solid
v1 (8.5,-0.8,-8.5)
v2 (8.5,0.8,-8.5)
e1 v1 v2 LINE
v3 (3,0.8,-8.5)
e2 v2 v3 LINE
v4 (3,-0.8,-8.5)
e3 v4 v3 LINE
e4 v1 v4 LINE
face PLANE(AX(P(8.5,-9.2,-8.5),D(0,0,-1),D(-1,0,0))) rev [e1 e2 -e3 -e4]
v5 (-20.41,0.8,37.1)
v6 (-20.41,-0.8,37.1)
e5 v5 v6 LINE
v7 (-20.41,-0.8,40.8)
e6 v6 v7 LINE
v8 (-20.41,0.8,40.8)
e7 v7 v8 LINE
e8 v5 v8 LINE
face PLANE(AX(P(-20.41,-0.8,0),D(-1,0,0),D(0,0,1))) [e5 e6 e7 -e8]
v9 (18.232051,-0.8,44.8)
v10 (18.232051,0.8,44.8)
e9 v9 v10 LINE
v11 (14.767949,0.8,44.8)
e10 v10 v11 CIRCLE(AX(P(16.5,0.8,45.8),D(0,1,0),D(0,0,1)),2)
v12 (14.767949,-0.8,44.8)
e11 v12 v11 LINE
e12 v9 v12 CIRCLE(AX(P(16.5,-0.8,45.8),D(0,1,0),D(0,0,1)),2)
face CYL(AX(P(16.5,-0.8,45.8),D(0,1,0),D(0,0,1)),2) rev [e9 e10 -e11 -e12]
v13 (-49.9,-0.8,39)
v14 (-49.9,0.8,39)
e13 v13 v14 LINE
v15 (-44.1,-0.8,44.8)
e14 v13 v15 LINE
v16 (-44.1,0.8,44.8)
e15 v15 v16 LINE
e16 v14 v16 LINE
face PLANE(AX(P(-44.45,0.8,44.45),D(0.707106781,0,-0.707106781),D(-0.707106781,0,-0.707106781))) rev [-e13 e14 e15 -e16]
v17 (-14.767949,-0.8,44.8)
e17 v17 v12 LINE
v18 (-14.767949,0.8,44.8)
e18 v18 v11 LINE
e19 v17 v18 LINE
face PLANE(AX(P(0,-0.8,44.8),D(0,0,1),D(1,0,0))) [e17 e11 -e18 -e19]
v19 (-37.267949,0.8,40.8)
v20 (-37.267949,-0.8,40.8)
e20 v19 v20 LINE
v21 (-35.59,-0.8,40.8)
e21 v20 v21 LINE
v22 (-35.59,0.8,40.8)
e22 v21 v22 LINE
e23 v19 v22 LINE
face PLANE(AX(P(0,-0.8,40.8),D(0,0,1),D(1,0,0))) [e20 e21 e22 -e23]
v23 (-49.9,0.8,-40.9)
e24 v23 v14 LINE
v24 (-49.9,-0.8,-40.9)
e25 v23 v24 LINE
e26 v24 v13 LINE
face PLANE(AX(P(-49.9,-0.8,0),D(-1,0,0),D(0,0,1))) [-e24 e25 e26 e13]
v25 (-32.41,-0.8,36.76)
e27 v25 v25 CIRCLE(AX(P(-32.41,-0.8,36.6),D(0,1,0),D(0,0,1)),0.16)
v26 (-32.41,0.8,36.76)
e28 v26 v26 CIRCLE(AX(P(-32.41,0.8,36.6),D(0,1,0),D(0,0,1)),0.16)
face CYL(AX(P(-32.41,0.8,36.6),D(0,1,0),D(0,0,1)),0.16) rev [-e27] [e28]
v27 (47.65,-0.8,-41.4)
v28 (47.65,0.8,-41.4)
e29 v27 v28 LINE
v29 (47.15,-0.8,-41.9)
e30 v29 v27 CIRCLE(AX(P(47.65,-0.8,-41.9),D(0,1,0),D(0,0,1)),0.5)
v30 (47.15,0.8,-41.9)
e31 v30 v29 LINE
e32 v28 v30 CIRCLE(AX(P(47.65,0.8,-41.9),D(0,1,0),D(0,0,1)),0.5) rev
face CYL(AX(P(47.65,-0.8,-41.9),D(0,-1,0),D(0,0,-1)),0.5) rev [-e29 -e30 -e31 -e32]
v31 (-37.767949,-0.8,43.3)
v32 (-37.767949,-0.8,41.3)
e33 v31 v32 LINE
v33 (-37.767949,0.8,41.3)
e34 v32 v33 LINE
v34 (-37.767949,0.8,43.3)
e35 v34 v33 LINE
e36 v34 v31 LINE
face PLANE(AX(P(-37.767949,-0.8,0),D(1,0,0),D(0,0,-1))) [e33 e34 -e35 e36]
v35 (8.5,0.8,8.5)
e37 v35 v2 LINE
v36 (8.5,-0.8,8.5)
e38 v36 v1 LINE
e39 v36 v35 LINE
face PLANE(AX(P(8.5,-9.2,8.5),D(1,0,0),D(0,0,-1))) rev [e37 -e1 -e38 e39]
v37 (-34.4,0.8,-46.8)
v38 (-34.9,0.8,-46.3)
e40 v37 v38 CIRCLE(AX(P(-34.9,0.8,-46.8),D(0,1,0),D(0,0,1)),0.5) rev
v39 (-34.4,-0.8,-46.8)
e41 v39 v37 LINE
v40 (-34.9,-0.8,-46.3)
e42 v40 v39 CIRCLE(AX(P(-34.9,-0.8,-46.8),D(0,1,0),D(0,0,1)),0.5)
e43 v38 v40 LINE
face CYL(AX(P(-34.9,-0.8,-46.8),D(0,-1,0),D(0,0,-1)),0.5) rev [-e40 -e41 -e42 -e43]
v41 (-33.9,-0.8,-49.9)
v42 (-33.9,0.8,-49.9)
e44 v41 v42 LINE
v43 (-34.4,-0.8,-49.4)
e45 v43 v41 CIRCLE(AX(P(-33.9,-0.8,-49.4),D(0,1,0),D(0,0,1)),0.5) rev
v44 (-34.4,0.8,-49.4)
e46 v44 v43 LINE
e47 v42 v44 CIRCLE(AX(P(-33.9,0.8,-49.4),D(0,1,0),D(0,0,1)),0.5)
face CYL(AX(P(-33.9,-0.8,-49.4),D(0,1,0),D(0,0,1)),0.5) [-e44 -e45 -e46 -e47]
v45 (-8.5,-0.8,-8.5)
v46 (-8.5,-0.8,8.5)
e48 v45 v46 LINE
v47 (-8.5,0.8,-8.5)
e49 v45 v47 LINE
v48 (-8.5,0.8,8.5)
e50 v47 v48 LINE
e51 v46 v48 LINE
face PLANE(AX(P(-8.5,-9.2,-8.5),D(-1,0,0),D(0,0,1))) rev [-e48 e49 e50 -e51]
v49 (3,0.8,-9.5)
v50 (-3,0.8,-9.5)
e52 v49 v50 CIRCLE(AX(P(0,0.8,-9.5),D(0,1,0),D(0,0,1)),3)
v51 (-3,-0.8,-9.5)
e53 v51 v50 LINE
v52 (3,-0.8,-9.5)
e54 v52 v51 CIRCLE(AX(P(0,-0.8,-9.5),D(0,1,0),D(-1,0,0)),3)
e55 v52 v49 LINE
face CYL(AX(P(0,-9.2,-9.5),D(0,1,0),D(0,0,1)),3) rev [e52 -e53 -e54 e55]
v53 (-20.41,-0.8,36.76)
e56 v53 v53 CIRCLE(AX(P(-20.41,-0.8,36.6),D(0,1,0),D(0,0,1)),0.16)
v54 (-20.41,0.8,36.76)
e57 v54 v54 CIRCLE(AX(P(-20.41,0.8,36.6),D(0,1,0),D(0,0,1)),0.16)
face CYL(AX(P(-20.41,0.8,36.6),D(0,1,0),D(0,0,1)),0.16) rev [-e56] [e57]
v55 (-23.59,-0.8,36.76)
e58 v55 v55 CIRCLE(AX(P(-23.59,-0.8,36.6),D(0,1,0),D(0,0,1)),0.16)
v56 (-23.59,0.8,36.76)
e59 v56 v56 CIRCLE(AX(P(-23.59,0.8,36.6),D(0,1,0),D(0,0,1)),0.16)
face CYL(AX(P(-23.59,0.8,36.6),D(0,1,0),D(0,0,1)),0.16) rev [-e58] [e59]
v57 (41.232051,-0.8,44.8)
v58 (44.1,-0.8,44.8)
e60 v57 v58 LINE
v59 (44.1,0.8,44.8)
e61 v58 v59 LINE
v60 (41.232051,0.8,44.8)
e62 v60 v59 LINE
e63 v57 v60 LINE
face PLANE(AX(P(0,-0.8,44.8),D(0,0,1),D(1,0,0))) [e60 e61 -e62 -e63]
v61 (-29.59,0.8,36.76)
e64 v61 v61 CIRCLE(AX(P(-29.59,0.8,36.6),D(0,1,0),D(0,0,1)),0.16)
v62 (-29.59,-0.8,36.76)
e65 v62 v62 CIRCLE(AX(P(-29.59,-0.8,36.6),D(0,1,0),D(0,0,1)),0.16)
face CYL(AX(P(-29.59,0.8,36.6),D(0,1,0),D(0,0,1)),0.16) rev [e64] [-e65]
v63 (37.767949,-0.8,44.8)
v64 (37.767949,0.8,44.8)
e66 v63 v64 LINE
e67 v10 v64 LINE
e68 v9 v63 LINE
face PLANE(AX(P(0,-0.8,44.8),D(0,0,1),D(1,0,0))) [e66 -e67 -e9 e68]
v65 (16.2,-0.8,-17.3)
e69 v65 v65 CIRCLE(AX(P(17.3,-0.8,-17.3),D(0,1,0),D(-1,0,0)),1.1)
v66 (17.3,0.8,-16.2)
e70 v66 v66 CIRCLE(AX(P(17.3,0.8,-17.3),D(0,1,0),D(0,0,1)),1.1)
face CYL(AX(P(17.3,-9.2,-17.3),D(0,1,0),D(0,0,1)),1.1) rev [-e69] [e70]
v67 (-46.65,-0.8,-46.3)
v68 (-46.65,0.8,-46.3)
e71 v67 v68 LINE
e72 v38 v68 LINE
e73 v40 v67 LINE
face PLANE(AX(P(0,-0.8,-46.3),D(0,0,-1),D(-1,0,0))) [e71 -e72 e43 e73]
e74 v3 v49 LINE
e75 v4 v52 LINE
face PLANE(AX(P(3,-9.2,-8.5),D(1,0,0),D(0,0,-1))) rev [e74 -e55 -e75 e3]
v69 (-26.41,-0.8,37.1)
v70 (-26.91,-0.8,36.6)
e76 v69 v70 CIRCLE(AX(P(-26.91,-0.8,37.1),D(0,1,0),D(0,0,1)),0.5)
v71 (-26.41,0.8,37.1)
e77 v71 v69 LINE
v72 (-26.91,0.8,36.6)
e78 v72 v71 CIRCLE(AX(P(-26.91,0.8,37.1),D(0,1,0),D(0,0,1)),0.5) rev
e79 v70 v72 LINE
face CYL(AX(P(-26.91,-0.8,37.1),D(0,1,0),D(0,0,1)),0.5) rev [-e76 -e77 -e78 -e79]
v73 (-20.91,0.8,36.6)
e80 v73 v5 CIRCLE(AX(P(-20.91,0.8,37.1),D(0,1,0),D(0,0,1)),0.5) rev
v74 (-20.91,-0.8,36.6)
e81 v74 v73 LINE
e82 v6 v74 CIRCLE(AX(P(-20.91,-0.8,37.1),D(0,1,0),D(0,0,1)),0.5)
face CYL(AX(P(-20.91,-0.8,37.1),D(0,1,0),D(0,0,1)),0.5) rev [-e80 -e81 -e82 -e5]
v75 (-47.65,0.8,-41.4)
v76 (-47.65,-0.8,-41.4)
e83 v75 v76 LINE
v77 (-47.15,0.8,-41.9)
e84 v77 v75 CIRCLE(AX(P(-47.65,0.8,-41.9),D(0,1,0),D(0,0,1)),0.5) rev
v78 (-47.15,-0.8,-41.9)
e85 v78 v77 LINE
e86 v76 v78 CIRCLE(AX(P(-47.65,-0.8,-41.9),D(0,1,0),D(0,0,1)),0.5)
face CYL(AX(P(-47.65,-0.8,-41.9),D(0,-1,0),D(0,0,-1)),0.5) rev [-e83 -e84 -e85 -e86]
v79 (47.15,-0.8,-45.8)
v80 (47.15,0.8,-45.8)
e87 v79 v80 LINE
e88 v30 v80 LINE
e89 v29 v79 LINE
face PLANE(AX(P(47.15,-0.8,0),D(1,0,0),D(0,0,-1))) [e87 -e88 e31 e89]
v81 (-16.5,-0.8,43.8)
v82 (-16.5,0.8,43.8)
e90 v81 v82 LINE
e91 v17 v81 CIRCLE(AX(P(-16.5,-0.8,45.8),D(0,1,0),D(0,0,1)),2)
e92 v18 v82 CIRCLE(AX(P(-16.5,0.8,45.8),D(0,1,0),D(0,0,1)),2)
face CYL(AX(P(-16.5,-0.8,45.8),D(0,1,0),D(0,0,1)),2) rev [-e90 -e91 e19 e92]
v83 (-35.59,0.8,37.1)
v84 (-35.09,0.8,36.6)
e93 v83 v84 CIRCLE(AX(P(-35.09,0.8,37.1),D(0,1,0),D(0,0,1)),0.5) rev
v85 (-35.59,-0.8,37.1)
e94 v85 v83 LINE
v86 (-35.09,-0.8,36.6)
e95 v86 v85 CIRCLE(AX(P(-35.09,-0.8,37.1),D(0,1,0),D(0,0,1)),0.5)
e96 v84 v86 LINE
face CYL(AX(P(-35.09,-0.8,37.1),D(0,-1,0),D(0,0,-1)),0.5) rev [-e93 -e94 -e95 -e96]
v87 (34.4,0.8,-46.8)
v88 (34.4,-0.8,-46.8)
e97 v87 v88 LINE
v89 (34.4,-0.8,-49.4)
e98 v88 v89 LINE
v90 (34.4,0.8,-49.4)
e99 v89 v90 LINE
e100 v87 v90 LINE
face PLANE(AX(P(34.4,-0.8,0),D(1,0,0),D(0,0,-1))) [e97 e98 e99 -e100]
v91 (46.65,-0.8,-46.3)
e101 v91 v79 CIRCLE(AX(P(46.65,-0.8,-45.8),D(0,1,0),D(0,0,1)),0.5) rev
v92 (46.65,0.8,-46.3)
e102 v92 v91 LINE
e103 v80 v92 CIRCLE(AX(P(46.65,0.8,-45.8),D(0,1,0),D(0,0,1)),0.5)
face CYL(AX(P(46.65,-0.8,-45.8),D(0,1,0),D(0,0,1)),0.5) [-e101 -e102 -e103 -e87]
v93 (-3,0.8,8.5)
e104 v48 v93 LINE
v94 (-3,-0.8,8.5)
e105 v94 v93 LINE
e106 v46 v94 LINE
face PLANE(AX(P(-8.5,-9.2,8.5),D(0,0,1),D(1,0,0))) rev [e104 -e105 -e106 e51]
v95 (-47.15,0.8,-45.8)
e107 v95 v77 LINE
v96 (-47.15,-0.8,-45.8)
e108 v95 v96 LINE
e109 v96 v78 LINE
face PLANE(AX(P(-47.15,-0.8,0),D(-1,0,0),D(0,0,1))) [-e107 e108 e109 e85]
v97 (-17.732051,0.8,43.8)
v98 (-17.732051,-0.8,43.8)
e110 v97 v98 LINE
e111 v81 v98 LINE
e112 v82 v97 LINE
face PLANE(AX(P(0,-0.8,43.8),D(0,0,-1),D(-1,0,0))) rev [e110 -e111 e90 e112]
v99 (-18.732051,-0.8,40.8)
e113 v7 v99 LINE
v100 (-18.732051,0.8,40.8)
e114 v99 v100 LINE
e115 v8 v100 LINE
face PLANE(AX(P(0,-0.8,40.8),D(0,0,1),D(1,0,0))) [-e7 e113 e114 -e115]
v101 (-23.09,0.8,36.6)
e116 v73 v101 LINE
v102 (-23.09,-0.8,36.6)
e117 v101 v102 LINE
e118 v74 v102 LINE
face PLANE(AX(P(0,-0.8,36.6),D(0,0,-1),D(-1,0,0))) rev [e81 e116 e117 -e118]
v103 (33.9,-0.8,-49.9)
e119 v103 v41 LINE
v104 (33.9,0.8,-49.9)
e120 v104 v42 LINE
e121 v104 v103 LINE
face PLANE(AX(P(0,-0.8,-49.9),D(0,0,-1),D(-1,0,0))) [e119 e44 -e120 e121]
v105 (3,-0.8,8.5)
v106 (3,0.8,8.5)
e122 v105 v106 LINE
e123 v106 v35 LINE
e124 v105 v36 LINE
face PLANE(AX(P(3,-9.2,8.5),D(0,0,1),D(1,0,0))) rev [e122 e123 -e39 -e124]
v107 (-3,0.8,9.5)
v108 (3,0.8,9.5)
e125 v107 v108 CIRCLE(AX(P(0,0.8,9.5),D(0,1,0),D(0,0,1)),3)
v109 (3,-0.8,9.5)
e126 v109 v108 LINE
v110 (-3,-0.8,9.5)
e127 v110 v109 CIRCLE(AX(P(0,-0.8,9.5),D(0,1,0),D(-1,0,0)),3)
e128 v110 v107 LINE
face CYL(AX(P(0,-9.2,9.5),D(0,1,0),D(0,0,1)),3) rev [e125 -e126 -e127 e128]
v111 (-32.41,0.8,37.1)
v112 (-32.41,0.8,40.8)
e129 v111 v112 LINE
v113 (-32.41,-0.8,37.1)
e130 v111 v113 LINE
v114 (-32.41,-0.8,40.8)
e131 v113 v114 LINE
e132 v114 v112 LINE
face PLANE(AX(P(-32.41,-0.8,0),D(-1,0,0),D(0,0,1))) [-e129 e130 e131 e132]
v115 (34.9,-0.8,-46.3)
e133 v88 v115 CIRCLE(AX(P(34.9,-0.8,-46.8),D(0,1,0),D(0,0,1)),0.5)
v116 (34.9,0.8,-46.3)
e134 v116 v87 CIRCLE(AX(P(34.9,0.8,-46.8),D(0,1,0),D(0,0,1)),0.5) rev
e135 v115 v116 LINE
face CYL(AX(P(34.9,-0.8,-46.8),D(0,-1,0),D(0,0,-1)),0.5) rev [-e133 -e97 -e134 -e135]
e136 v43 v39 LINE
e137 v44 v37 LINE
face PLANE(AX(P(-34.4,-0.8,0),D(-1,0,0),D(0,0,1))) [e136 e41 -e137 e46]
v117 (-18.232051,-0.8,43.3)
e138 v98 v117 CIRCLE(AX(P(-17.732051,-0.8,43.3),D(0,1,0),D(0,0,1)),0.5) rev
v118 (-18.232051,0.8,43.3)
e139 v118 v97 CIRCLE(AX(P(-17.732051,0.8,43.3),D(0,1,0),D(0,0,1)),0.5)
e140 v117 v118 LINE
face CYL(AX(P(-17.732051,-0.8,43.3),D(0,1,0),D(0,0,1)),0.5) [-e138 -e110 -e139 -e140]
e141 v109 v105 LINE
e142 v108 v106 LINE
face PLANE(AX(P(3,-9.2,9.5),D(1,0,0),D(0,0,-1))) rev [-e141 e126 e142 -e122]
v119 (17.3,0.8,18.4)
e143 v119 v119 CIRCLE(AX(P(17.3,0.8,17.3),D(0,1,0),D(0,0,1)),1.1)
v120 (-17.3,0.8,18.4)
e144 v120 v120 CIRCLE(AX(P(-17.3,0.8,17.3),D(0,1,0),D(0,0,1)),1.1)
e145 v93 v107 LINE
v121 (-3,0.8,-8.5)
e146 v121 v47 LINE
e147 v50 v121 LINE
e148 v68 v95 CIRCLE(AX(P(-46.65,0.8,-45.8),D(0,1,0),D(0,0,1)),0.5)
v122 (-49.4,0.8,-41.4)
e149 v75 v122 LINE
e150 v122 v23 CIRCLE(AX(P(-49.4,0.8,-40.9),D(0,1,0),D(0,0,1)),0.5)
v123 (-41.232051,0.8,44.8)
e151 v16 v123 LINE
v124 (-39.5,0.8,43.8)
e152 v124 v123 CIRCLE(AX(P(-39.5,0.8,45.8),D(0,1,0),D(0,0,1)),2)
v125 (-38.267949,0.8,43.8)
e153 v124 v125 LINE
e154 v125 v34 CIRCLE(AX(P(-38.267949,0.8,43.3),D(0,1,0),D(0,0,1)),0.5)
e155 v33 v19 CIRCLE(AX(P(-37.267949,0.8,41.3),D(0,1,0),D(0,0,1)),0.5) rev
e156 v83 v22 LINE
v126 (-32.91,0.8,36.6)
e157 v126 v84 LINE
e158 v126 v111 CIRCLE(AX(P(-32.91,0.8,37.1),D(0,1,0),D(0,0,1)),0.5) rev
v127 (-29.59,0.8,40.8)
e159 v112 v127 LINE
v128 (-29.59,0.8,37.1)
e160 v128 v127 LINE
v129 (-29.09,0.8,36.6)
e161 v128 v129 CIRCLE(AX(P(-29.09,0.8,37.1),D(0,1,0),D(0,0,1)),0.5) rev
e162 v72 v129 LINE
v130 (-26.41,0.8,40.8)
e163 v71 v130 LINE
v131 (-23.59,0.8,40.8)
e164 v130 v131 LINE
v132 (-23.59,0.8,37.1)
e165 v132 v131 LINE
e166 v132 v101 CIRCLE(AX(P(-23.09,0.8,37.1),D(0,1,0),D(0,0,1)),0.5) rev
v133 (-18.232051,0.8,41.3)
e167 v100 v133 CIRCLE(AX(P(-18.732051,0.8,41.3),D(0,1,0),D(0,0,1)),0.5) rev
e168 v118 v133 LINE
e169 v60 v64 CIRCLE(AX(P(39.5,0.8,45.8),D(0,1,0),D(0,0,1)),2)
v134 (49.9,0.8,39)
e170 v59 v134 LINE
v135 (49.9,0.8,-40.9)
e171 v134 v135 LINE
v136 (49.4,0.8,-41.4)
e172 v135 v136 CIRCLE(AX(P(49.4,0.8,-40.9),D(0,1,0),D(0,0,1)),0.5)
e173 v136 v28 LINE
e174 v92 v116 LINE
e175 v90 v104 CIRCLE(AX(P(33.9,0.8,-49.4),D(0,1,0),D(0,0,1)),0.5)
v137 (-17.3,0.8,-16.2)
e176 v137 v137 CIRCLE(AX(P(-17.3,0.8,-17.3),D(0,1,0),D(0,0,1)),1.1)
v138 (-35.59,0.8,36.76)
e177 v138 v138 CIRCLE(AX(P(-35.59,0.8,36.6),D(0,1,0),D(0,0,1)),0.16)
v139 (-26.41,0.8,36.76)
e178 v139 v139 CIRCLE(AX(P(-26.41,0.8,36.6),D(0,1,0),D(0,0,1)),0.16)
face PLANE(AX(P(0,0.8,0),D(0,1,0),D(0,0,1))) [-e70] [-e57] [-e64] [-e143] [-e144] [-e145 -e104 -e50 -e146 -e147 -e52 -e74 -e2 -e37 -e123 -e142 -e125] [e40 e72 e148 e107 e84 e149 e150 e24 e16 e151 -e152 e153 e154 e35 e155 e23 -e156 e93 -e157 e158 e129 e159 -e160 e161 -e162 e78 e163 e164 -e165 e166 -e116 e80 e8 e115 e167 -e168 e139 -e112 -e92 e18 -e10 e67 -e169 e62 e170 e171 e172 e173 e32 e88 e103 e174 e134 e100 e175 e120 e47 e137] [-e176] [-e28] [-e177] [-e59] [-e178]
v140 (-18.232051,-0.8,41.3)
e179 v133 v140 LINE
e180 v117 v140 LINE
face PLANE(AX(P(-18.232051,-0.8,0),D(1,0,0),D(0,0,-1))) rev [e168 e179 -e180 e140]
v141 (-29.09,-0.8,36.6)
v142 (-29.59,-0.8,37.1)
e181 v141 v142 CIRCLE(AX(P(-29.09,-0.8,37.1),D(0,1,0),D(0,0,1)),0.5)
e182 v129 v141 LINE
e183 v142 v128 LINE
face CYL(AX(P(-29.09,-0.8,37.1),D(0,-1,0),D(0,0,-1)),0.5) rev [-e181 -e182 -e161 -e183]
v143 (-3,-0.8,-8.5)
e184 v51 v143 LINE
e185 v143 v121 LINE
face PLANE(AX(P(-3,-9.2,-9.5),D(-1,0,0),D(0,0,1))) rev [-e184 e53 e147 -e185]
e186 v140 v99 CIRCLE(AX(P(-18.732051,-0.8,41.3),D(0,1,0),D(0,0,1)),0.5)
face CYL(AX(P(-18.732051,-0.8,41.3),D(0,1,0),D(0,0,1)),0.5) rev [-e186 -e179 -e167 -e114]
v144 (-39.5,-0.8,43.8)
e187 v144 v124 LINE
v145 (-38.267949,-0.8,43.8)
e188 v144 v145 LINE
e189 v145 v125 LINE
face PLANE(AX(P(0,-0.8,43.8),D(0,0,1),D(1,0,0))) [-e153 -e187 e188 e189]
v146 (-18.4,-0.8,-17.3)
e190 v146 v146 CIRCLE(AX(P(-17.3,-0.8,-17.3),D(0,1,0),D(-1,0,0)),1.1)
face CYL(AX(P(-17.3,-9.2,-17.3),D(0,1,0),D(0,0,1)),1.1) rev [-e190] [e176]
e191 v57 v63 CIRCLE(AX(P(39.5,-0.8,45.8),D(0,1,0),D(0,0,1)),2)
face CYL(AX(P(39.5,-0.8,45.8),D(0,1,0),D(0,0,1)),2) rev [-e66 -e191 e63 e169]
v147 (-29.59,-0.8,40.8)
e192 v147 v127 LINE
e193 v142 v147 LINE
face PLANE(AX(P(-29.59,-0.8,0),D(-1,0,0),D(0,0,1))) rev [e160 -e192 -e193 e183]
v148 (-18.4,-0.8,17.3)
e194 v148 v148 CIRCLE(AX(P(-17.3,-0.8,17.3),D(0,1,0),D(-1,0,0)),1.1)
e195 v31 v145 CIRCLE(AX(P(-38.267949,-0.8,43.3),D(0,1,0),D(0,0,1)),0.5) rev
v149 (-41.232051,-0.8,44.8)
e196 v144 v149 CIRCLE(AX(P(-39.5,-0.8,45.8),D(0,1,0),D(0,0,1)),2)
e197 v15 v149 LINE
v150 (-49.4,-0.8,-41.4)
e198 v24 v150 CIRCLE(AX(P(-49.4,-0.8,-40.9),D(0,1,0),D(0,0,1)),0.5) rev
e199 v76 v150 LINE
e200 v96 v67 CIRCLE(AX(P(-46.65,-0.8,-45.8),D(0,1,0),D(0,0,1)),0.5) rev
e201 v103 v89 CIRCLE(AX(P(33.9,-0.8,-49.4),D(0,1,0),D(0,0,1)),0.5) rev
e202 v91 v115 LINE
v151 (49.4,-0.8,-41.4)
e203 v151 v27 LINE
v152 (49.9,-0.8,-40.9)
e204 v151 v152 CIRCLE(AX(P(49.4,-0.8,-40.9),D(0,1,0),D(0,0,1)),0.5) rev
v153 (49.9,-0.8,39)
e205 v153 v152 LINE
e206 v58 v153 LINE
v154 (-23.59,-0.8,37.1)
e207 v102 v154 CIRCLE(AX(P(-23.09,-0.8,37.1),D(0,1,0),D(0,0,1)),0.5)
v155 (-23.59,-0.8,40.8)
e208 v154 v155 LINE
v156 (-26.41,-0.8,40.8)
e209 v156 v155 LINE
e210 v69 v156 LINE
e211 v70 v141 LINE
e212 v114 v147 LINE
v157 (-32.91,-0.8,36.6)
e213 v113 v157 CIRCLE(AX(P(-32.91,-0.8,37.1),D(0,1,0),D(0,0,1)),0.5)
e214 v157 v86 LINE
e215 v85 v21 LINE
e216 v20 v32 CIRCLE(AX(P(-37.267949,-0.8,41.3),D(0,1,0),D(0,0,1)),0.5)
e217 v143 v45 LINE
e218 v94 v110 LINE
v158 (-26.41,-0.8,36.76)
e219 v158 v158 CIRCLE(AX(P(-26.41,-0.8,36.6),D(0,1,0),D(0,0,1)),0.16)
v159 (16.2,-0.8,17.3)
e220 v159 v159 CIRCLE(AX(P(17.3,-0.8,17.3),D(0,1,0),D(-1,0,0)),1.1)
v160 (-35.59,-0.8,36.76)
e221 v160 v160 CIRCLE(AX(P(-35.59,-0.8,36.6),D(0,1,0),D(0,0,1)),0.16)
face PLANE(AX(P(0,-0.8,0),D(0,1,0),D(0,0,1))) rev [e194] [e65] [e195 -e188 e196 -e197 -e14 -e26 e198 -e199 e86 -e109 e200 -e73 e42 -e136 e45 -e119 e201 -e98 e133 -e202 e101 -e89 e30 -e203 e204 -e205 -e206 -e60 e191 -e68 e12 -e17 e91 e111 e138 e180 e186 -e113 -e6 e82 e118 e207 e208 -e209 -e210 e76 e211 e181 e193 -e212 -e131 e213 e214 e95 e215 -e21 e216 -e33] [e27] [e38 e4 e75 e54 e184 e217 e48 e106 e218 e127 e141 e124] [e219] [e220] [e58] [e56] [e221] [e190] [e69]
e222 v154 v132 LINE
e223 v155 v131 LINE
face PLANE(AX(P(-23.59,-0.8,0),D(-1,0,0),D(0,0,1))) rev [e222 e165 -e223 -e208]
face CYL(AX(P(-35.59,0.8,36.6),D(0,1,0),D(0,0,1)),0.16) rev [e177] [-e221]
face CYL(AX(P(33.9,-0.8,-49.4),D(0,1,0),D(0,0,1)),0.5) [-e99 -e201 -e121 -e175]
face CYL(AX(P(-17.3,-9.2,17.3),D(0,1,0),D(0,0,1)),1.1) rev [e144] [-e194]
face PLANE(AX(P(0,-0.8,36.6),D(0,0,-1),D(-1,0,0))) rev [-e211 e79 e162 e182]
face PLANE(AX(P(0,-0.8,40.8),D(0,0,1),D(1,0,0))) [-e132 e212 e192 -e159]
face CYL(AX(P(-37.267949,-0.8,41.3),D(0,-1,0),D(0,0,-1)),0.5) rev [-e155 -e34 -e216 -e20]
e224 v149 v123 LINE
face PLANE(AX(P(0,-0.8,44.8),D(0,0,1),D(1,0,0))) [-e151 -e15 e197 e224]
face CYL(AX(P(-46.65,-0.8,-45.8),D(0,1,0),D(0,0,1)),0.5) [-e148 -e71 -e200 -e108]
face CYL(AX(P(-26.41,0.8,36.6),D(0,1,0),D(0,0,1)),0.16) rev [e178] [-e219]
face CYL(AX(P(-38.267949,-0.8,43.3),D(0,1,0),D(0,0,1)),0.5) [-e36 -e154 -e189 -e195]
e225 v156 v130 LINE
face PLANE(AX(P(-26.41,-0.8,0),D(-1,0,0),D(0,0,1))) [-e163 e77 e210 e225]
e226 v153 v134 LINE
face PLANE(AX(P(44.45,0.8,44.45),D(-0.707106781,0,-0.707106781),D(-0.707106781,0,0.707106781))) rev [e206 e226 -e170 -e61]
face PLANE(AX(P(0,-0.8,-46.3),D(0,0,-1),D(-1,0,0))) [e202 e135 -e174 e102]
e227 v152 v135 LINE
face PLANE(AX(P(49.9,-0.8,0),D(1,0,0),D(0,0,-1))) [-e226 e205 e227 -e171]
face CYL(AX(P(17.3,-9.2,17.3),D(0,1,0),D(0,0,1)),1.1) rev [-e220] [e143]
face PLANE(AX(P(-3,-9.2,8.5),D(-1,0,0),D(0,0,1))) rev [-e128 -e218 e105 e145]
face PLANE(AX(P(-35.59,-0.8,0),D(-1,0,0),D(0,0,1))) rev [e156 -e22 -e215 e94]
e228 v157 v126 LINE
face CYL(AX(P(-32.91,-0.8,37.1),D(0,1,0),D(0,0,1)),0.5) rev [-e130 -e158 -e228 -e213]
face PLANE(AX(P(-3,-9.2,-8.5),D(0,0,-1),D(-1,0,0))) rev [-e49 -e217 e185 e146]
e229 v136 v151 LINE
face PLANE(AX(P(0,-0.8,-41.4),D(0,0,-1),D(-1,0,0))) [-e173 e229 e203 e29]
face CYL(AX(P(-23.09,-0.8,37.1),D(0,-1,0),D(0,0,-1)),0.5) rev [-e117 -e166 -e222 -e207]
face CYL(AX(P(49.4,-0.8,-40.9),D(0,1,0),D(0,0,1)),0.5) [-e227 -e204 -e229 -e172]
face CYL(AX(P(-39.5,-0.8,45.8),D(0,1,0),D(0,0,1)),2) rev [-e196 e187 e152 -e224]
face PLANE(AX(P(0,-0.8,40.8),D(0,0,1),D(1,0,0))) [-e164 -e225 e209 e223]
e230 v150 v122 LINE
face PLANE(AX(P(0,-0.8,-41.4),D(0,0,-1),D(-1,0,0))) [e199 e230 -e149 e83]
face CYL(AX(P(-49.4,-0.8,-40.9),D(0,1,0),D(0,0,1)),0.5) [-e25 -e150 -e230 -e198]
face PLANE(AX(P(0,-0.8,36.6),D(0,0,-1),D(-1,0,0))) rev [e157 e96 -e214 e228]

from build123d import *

# Parameters (mm, degrees)
GENERICCARDPCBDEFINITION_FILLET3_START   = -0.8
GENERICCARDPCBDEFINITION_FILLET3_OUTLI_R = 0.16
GENERICCARDPCBDEFINITION_FILLET3_DEPTH   = 1.6
SKETCH1_R                                = 1.1
CUT_EXTRUDE1_DEPTH                       = 10


# Read off the part's stored shape, not the designer's step: <GenericCardPCBDefinition>-<Fillet3>
with BuildPart() as part:
    # <GenericCardPCBDefinition>-<Fillet3> outli → <GenericCardPCBDefinition>-<Fillet3> (new body)
    with BuildSketch(Plane(origin=(0, 0, 0), x_dir=(1, 0, 0), z_dir=(0, 1, 0)).offset(GENERICCARDPCBDEFINITION_FILLET3_START)):
        with BuildLine():
            ThreePointArc((-41.232050808, -44.8), (-40.5, -44.067949192), (-39.5, -43.8))
            Line((-39.5, -43.8), (-38.267949192, -43.8))
            ThreePointArc((-38.267949192, -43.8), (-37.914395801, -43.653553391), (-37.767949192, -43.3))
            Line((-37.767949192, -43.3), (-37.767949192, -41.3))
            ThreePointArc((-37.767949192, -41.3), (-37.621502583, -40.946446609), (-37.267949192, -40.8))
            Line((-37.267949192, -40.8), (-35.59, -40.8))
            Line((-35.59, -40.8), (-35.59, -37.1))
            ThreePointArc((-35.59, -37.1), (-35.443553391, -36.746446609), (-35.09, -36.6))
            Line((-35.09, -36.6), (-32.91, -36.6))
            ThreePointArc((-32.91, -36.6), (-32.556446609, -36.746446609), (-32.41, -37.1))
            Line((-32.41, -37.1), (-32.41, -40.8))
            Line((-32.41, -40.8), (-29.59, -40.8))
            Line((-29.59, -40.8), (-29.59, -37.1))
            ThreePointArc((-29.59, -37.1), (-29.443553391, -36.746446609), (-29.09, -36.6))
            Line((-29.09, -36.6), (-26.91, -36.6))
            ThreePointArc((-26.91, -36.6), (-26.556446609, -36.746446609), (-26.41, -37.1))
            Line((-26.41, -37.1), (-26.41, -40.8))
            Line((-26.41, -40.8), (-23.59, -40.8))
            Line((-23.59, -40.8), (-23.59, -37.1))
            ThreePointArc((-23.59, -37.1), (-23.443553391, -36.746446609), (-23.09, -36.6))
            Line((-23.09, -36.6), (-20.91, -36.6))
            ThreePointArc((-20.91, -36.6), (-20.556446609, -36.746446609), (-20.41, -37.1))
            Line((-20.41, -37.1), (-20.41, -40.8))
            Line((-20.41, -40.8), (-18.732050808, -40.8))
            ThreePointArc((-18.732050808, -40.8), (-18.378497417, -40.946446609), (-18.232050808, -41.3))
            Line((-18.232050808, -41.3), (-18.232050808, -43.3))
            ThreePointArc((-18.232050808, -43.3), (-18.085604199, -43.653553391), (-17.732050808, -43.8))
            Line((-17.732050808, -43.8), (-16.5, -43.8))
            ThreePointArc((-16.5, -43.8), (-15.5, -44.067949192), (-14.767949192, -44.8))
            Line((-14.767949192, -44.8), (14.767949192, -44.8))
            ThreePointArc((14.767949192, -44.8), (16.5, -43.8), (18.232050808, -44.8))
            Line((18.232050808, -44.8), (37.767949192, -44.8))
            ThreePointArc((37.767949192, -44.8), (39.5, -43.8), (41.232050808, -44.8))
            Line((41.232050808, -44.8), (44.1, -44.8))
            Line((44.1, -44.8), (49.9, -39))
            Line((49.9, -39), (49.9, 40.9))
            ThreePointArc((49.9, 40.9), (49.753553391, 41.253553391), (49.4, 41.4))
            Line((49.4, 41.4), (47.65, 41.4))
            ThreePointArc((47.65, 41.4), (47.296446609, 41.546446609), (47.15, 41.9))
            Line((47.15, 41.9), (47.15, 45.8))
            ThreePointArc((47.15, 45.8), (47.003553391, 46.153553391), (46.65, 46.3))
            Line((46.65, 46.3), (34.9, 46.3))
            ThreePointArc((34.9, 46.3), (34.546446609, 46.446446609), (34.4, 46.8))
            Line((34.4, 46.8), (34.4, 49.4))
            ThreePointArc((34.4, 49.4), (34.253553391, 49.753553391), (33.9, 49.9))
            Line((33.9, 49.9), (-33.9, 49.9))
            ThreePointArc((-33.9, 49.9), (-34.253553391, 49.753553391), (-34.4, 49.4))
            Line((-34.4, 49.4), (-34.4, 46.8))
            ThreePointArc((-34.4, 46.8), (-34.546446609, 46.446446609), (-34.9, 46.3))
            Line((-34.9, 46.3), (-46.65, 46.3))
            ThreePointArc((-46.65, 46.3), (-47.003553391, 46.153553391), (-47.15, 45.8))
            Line((-47.15, 45.8), (-47.15, 41.9))
            ThreePointArc((-47.15, 41.9), (-47.296446609, 41.546446609), (-47.65, 41.4))
            Line((-47.65, 41.4), (-49.4, 41.4))
            ThreePointArc((-49.4, 41.4), (-49.753553391, 41.253553391), (-49.9, 40.9))
            Line((-49.9, 40.9), (-49.9, -39))
            Line((-49.9, -39), (-44.1, -44.8))
            Line((-44.1, -44.8), (-41.232050808, -44.8))
        make_face()
        with Locations((-35.59, -36.6)):
            Circle(GENERICCARDPCBDEFINITION_FILLET3_OUTLI_R, mode=Mode.SUBTRACT)
        with Locations((-32.41, -36.6)):
            Circle(GENERICCARDPCBDEFINITION_FILLET3_OUTLI_R, mode=Mode.SUBTRACT)
        with Locations((-29.59, -36.6)):
            Circle(GENERICCARDPCBDEFINITION_FILLET3_OUTLI_R, mode=Mode.SUBTRACT)
        with Locations((-26.41, -36.6)):
            Circle(GENERICCARDPCBDEFINITION_FILLET3_OUTLI_R, mode=Mode.SUBTRACT)
        with Locations((-23.59, -36.6)):
            Circle(GENERICCARDPCBDEFINITION_FILLET3_OUTLI_R, mode=Mode.SUBTRACT)
        with Locations((-20.41, -36.6)):
            Circle(GENERICCARDPCBDEFINITION_FILLET3_OUTLI_R, mode=Mode.SUBTRACT)
    extrude(amount=GENERICCARDPCBDEFINITION_FILLET3_DEPTH)

    # Sketch1 → Cut-Extrude1 (cut)
    with BuildSketch(Plane(origin=(0, 0.8, 0), x_dir=(1, 0, 0), z_dir=(0, 1, 0))):
        with Locations(Location((-17.3, -17.3, 0), (0, 0, 270))):
            Circle(SKETCH1_R)
        with Locations(Location((17.3, -17.3, 0), (0, 0, 270))):
            Circle(SKETCH1_R)
        with Locations(Location((-17.3, 17.3, 0), (0, 0, 270))):
            Circle(SKETCH1_R)
        with Locations(Location((17.3, 17.3, 0), (0, 0, 270))):
            Circle(SKETCH1_R)
        with BuildLine():
            Line((8.5, -8.5), (8.5, 8.5))
            Line((8.5, 8.5), (3, 8.5))
            Line((3, 8.5), (3, 9.5))
            ThreePointArc((3, 9.5), (0, 12.5), (-3, 9.5))
            Line((-3, 9.5), (-3, 8.5))
            Line((-3, 8.5), (-8.5, 8.5))
            Line((-8.5, 8.5), (-8.5, -8.5))
            Line((-8.5, -8.5), (-3, -8.5))
            Line((-3, -8.5), (-3, -9.5))
            ThreePointArc((-3, -9.5), (0, -12.5), (3, -9.5))
            Line((3, -9.5), (3, -8.5))
            Line((3, -8.5), (8.5, -8.5))
        make_face()
    extrude(amount=-CUT_EXTRUDE1_DEPTH, mode=Mode.SUBTRACT)


solid = part.part
